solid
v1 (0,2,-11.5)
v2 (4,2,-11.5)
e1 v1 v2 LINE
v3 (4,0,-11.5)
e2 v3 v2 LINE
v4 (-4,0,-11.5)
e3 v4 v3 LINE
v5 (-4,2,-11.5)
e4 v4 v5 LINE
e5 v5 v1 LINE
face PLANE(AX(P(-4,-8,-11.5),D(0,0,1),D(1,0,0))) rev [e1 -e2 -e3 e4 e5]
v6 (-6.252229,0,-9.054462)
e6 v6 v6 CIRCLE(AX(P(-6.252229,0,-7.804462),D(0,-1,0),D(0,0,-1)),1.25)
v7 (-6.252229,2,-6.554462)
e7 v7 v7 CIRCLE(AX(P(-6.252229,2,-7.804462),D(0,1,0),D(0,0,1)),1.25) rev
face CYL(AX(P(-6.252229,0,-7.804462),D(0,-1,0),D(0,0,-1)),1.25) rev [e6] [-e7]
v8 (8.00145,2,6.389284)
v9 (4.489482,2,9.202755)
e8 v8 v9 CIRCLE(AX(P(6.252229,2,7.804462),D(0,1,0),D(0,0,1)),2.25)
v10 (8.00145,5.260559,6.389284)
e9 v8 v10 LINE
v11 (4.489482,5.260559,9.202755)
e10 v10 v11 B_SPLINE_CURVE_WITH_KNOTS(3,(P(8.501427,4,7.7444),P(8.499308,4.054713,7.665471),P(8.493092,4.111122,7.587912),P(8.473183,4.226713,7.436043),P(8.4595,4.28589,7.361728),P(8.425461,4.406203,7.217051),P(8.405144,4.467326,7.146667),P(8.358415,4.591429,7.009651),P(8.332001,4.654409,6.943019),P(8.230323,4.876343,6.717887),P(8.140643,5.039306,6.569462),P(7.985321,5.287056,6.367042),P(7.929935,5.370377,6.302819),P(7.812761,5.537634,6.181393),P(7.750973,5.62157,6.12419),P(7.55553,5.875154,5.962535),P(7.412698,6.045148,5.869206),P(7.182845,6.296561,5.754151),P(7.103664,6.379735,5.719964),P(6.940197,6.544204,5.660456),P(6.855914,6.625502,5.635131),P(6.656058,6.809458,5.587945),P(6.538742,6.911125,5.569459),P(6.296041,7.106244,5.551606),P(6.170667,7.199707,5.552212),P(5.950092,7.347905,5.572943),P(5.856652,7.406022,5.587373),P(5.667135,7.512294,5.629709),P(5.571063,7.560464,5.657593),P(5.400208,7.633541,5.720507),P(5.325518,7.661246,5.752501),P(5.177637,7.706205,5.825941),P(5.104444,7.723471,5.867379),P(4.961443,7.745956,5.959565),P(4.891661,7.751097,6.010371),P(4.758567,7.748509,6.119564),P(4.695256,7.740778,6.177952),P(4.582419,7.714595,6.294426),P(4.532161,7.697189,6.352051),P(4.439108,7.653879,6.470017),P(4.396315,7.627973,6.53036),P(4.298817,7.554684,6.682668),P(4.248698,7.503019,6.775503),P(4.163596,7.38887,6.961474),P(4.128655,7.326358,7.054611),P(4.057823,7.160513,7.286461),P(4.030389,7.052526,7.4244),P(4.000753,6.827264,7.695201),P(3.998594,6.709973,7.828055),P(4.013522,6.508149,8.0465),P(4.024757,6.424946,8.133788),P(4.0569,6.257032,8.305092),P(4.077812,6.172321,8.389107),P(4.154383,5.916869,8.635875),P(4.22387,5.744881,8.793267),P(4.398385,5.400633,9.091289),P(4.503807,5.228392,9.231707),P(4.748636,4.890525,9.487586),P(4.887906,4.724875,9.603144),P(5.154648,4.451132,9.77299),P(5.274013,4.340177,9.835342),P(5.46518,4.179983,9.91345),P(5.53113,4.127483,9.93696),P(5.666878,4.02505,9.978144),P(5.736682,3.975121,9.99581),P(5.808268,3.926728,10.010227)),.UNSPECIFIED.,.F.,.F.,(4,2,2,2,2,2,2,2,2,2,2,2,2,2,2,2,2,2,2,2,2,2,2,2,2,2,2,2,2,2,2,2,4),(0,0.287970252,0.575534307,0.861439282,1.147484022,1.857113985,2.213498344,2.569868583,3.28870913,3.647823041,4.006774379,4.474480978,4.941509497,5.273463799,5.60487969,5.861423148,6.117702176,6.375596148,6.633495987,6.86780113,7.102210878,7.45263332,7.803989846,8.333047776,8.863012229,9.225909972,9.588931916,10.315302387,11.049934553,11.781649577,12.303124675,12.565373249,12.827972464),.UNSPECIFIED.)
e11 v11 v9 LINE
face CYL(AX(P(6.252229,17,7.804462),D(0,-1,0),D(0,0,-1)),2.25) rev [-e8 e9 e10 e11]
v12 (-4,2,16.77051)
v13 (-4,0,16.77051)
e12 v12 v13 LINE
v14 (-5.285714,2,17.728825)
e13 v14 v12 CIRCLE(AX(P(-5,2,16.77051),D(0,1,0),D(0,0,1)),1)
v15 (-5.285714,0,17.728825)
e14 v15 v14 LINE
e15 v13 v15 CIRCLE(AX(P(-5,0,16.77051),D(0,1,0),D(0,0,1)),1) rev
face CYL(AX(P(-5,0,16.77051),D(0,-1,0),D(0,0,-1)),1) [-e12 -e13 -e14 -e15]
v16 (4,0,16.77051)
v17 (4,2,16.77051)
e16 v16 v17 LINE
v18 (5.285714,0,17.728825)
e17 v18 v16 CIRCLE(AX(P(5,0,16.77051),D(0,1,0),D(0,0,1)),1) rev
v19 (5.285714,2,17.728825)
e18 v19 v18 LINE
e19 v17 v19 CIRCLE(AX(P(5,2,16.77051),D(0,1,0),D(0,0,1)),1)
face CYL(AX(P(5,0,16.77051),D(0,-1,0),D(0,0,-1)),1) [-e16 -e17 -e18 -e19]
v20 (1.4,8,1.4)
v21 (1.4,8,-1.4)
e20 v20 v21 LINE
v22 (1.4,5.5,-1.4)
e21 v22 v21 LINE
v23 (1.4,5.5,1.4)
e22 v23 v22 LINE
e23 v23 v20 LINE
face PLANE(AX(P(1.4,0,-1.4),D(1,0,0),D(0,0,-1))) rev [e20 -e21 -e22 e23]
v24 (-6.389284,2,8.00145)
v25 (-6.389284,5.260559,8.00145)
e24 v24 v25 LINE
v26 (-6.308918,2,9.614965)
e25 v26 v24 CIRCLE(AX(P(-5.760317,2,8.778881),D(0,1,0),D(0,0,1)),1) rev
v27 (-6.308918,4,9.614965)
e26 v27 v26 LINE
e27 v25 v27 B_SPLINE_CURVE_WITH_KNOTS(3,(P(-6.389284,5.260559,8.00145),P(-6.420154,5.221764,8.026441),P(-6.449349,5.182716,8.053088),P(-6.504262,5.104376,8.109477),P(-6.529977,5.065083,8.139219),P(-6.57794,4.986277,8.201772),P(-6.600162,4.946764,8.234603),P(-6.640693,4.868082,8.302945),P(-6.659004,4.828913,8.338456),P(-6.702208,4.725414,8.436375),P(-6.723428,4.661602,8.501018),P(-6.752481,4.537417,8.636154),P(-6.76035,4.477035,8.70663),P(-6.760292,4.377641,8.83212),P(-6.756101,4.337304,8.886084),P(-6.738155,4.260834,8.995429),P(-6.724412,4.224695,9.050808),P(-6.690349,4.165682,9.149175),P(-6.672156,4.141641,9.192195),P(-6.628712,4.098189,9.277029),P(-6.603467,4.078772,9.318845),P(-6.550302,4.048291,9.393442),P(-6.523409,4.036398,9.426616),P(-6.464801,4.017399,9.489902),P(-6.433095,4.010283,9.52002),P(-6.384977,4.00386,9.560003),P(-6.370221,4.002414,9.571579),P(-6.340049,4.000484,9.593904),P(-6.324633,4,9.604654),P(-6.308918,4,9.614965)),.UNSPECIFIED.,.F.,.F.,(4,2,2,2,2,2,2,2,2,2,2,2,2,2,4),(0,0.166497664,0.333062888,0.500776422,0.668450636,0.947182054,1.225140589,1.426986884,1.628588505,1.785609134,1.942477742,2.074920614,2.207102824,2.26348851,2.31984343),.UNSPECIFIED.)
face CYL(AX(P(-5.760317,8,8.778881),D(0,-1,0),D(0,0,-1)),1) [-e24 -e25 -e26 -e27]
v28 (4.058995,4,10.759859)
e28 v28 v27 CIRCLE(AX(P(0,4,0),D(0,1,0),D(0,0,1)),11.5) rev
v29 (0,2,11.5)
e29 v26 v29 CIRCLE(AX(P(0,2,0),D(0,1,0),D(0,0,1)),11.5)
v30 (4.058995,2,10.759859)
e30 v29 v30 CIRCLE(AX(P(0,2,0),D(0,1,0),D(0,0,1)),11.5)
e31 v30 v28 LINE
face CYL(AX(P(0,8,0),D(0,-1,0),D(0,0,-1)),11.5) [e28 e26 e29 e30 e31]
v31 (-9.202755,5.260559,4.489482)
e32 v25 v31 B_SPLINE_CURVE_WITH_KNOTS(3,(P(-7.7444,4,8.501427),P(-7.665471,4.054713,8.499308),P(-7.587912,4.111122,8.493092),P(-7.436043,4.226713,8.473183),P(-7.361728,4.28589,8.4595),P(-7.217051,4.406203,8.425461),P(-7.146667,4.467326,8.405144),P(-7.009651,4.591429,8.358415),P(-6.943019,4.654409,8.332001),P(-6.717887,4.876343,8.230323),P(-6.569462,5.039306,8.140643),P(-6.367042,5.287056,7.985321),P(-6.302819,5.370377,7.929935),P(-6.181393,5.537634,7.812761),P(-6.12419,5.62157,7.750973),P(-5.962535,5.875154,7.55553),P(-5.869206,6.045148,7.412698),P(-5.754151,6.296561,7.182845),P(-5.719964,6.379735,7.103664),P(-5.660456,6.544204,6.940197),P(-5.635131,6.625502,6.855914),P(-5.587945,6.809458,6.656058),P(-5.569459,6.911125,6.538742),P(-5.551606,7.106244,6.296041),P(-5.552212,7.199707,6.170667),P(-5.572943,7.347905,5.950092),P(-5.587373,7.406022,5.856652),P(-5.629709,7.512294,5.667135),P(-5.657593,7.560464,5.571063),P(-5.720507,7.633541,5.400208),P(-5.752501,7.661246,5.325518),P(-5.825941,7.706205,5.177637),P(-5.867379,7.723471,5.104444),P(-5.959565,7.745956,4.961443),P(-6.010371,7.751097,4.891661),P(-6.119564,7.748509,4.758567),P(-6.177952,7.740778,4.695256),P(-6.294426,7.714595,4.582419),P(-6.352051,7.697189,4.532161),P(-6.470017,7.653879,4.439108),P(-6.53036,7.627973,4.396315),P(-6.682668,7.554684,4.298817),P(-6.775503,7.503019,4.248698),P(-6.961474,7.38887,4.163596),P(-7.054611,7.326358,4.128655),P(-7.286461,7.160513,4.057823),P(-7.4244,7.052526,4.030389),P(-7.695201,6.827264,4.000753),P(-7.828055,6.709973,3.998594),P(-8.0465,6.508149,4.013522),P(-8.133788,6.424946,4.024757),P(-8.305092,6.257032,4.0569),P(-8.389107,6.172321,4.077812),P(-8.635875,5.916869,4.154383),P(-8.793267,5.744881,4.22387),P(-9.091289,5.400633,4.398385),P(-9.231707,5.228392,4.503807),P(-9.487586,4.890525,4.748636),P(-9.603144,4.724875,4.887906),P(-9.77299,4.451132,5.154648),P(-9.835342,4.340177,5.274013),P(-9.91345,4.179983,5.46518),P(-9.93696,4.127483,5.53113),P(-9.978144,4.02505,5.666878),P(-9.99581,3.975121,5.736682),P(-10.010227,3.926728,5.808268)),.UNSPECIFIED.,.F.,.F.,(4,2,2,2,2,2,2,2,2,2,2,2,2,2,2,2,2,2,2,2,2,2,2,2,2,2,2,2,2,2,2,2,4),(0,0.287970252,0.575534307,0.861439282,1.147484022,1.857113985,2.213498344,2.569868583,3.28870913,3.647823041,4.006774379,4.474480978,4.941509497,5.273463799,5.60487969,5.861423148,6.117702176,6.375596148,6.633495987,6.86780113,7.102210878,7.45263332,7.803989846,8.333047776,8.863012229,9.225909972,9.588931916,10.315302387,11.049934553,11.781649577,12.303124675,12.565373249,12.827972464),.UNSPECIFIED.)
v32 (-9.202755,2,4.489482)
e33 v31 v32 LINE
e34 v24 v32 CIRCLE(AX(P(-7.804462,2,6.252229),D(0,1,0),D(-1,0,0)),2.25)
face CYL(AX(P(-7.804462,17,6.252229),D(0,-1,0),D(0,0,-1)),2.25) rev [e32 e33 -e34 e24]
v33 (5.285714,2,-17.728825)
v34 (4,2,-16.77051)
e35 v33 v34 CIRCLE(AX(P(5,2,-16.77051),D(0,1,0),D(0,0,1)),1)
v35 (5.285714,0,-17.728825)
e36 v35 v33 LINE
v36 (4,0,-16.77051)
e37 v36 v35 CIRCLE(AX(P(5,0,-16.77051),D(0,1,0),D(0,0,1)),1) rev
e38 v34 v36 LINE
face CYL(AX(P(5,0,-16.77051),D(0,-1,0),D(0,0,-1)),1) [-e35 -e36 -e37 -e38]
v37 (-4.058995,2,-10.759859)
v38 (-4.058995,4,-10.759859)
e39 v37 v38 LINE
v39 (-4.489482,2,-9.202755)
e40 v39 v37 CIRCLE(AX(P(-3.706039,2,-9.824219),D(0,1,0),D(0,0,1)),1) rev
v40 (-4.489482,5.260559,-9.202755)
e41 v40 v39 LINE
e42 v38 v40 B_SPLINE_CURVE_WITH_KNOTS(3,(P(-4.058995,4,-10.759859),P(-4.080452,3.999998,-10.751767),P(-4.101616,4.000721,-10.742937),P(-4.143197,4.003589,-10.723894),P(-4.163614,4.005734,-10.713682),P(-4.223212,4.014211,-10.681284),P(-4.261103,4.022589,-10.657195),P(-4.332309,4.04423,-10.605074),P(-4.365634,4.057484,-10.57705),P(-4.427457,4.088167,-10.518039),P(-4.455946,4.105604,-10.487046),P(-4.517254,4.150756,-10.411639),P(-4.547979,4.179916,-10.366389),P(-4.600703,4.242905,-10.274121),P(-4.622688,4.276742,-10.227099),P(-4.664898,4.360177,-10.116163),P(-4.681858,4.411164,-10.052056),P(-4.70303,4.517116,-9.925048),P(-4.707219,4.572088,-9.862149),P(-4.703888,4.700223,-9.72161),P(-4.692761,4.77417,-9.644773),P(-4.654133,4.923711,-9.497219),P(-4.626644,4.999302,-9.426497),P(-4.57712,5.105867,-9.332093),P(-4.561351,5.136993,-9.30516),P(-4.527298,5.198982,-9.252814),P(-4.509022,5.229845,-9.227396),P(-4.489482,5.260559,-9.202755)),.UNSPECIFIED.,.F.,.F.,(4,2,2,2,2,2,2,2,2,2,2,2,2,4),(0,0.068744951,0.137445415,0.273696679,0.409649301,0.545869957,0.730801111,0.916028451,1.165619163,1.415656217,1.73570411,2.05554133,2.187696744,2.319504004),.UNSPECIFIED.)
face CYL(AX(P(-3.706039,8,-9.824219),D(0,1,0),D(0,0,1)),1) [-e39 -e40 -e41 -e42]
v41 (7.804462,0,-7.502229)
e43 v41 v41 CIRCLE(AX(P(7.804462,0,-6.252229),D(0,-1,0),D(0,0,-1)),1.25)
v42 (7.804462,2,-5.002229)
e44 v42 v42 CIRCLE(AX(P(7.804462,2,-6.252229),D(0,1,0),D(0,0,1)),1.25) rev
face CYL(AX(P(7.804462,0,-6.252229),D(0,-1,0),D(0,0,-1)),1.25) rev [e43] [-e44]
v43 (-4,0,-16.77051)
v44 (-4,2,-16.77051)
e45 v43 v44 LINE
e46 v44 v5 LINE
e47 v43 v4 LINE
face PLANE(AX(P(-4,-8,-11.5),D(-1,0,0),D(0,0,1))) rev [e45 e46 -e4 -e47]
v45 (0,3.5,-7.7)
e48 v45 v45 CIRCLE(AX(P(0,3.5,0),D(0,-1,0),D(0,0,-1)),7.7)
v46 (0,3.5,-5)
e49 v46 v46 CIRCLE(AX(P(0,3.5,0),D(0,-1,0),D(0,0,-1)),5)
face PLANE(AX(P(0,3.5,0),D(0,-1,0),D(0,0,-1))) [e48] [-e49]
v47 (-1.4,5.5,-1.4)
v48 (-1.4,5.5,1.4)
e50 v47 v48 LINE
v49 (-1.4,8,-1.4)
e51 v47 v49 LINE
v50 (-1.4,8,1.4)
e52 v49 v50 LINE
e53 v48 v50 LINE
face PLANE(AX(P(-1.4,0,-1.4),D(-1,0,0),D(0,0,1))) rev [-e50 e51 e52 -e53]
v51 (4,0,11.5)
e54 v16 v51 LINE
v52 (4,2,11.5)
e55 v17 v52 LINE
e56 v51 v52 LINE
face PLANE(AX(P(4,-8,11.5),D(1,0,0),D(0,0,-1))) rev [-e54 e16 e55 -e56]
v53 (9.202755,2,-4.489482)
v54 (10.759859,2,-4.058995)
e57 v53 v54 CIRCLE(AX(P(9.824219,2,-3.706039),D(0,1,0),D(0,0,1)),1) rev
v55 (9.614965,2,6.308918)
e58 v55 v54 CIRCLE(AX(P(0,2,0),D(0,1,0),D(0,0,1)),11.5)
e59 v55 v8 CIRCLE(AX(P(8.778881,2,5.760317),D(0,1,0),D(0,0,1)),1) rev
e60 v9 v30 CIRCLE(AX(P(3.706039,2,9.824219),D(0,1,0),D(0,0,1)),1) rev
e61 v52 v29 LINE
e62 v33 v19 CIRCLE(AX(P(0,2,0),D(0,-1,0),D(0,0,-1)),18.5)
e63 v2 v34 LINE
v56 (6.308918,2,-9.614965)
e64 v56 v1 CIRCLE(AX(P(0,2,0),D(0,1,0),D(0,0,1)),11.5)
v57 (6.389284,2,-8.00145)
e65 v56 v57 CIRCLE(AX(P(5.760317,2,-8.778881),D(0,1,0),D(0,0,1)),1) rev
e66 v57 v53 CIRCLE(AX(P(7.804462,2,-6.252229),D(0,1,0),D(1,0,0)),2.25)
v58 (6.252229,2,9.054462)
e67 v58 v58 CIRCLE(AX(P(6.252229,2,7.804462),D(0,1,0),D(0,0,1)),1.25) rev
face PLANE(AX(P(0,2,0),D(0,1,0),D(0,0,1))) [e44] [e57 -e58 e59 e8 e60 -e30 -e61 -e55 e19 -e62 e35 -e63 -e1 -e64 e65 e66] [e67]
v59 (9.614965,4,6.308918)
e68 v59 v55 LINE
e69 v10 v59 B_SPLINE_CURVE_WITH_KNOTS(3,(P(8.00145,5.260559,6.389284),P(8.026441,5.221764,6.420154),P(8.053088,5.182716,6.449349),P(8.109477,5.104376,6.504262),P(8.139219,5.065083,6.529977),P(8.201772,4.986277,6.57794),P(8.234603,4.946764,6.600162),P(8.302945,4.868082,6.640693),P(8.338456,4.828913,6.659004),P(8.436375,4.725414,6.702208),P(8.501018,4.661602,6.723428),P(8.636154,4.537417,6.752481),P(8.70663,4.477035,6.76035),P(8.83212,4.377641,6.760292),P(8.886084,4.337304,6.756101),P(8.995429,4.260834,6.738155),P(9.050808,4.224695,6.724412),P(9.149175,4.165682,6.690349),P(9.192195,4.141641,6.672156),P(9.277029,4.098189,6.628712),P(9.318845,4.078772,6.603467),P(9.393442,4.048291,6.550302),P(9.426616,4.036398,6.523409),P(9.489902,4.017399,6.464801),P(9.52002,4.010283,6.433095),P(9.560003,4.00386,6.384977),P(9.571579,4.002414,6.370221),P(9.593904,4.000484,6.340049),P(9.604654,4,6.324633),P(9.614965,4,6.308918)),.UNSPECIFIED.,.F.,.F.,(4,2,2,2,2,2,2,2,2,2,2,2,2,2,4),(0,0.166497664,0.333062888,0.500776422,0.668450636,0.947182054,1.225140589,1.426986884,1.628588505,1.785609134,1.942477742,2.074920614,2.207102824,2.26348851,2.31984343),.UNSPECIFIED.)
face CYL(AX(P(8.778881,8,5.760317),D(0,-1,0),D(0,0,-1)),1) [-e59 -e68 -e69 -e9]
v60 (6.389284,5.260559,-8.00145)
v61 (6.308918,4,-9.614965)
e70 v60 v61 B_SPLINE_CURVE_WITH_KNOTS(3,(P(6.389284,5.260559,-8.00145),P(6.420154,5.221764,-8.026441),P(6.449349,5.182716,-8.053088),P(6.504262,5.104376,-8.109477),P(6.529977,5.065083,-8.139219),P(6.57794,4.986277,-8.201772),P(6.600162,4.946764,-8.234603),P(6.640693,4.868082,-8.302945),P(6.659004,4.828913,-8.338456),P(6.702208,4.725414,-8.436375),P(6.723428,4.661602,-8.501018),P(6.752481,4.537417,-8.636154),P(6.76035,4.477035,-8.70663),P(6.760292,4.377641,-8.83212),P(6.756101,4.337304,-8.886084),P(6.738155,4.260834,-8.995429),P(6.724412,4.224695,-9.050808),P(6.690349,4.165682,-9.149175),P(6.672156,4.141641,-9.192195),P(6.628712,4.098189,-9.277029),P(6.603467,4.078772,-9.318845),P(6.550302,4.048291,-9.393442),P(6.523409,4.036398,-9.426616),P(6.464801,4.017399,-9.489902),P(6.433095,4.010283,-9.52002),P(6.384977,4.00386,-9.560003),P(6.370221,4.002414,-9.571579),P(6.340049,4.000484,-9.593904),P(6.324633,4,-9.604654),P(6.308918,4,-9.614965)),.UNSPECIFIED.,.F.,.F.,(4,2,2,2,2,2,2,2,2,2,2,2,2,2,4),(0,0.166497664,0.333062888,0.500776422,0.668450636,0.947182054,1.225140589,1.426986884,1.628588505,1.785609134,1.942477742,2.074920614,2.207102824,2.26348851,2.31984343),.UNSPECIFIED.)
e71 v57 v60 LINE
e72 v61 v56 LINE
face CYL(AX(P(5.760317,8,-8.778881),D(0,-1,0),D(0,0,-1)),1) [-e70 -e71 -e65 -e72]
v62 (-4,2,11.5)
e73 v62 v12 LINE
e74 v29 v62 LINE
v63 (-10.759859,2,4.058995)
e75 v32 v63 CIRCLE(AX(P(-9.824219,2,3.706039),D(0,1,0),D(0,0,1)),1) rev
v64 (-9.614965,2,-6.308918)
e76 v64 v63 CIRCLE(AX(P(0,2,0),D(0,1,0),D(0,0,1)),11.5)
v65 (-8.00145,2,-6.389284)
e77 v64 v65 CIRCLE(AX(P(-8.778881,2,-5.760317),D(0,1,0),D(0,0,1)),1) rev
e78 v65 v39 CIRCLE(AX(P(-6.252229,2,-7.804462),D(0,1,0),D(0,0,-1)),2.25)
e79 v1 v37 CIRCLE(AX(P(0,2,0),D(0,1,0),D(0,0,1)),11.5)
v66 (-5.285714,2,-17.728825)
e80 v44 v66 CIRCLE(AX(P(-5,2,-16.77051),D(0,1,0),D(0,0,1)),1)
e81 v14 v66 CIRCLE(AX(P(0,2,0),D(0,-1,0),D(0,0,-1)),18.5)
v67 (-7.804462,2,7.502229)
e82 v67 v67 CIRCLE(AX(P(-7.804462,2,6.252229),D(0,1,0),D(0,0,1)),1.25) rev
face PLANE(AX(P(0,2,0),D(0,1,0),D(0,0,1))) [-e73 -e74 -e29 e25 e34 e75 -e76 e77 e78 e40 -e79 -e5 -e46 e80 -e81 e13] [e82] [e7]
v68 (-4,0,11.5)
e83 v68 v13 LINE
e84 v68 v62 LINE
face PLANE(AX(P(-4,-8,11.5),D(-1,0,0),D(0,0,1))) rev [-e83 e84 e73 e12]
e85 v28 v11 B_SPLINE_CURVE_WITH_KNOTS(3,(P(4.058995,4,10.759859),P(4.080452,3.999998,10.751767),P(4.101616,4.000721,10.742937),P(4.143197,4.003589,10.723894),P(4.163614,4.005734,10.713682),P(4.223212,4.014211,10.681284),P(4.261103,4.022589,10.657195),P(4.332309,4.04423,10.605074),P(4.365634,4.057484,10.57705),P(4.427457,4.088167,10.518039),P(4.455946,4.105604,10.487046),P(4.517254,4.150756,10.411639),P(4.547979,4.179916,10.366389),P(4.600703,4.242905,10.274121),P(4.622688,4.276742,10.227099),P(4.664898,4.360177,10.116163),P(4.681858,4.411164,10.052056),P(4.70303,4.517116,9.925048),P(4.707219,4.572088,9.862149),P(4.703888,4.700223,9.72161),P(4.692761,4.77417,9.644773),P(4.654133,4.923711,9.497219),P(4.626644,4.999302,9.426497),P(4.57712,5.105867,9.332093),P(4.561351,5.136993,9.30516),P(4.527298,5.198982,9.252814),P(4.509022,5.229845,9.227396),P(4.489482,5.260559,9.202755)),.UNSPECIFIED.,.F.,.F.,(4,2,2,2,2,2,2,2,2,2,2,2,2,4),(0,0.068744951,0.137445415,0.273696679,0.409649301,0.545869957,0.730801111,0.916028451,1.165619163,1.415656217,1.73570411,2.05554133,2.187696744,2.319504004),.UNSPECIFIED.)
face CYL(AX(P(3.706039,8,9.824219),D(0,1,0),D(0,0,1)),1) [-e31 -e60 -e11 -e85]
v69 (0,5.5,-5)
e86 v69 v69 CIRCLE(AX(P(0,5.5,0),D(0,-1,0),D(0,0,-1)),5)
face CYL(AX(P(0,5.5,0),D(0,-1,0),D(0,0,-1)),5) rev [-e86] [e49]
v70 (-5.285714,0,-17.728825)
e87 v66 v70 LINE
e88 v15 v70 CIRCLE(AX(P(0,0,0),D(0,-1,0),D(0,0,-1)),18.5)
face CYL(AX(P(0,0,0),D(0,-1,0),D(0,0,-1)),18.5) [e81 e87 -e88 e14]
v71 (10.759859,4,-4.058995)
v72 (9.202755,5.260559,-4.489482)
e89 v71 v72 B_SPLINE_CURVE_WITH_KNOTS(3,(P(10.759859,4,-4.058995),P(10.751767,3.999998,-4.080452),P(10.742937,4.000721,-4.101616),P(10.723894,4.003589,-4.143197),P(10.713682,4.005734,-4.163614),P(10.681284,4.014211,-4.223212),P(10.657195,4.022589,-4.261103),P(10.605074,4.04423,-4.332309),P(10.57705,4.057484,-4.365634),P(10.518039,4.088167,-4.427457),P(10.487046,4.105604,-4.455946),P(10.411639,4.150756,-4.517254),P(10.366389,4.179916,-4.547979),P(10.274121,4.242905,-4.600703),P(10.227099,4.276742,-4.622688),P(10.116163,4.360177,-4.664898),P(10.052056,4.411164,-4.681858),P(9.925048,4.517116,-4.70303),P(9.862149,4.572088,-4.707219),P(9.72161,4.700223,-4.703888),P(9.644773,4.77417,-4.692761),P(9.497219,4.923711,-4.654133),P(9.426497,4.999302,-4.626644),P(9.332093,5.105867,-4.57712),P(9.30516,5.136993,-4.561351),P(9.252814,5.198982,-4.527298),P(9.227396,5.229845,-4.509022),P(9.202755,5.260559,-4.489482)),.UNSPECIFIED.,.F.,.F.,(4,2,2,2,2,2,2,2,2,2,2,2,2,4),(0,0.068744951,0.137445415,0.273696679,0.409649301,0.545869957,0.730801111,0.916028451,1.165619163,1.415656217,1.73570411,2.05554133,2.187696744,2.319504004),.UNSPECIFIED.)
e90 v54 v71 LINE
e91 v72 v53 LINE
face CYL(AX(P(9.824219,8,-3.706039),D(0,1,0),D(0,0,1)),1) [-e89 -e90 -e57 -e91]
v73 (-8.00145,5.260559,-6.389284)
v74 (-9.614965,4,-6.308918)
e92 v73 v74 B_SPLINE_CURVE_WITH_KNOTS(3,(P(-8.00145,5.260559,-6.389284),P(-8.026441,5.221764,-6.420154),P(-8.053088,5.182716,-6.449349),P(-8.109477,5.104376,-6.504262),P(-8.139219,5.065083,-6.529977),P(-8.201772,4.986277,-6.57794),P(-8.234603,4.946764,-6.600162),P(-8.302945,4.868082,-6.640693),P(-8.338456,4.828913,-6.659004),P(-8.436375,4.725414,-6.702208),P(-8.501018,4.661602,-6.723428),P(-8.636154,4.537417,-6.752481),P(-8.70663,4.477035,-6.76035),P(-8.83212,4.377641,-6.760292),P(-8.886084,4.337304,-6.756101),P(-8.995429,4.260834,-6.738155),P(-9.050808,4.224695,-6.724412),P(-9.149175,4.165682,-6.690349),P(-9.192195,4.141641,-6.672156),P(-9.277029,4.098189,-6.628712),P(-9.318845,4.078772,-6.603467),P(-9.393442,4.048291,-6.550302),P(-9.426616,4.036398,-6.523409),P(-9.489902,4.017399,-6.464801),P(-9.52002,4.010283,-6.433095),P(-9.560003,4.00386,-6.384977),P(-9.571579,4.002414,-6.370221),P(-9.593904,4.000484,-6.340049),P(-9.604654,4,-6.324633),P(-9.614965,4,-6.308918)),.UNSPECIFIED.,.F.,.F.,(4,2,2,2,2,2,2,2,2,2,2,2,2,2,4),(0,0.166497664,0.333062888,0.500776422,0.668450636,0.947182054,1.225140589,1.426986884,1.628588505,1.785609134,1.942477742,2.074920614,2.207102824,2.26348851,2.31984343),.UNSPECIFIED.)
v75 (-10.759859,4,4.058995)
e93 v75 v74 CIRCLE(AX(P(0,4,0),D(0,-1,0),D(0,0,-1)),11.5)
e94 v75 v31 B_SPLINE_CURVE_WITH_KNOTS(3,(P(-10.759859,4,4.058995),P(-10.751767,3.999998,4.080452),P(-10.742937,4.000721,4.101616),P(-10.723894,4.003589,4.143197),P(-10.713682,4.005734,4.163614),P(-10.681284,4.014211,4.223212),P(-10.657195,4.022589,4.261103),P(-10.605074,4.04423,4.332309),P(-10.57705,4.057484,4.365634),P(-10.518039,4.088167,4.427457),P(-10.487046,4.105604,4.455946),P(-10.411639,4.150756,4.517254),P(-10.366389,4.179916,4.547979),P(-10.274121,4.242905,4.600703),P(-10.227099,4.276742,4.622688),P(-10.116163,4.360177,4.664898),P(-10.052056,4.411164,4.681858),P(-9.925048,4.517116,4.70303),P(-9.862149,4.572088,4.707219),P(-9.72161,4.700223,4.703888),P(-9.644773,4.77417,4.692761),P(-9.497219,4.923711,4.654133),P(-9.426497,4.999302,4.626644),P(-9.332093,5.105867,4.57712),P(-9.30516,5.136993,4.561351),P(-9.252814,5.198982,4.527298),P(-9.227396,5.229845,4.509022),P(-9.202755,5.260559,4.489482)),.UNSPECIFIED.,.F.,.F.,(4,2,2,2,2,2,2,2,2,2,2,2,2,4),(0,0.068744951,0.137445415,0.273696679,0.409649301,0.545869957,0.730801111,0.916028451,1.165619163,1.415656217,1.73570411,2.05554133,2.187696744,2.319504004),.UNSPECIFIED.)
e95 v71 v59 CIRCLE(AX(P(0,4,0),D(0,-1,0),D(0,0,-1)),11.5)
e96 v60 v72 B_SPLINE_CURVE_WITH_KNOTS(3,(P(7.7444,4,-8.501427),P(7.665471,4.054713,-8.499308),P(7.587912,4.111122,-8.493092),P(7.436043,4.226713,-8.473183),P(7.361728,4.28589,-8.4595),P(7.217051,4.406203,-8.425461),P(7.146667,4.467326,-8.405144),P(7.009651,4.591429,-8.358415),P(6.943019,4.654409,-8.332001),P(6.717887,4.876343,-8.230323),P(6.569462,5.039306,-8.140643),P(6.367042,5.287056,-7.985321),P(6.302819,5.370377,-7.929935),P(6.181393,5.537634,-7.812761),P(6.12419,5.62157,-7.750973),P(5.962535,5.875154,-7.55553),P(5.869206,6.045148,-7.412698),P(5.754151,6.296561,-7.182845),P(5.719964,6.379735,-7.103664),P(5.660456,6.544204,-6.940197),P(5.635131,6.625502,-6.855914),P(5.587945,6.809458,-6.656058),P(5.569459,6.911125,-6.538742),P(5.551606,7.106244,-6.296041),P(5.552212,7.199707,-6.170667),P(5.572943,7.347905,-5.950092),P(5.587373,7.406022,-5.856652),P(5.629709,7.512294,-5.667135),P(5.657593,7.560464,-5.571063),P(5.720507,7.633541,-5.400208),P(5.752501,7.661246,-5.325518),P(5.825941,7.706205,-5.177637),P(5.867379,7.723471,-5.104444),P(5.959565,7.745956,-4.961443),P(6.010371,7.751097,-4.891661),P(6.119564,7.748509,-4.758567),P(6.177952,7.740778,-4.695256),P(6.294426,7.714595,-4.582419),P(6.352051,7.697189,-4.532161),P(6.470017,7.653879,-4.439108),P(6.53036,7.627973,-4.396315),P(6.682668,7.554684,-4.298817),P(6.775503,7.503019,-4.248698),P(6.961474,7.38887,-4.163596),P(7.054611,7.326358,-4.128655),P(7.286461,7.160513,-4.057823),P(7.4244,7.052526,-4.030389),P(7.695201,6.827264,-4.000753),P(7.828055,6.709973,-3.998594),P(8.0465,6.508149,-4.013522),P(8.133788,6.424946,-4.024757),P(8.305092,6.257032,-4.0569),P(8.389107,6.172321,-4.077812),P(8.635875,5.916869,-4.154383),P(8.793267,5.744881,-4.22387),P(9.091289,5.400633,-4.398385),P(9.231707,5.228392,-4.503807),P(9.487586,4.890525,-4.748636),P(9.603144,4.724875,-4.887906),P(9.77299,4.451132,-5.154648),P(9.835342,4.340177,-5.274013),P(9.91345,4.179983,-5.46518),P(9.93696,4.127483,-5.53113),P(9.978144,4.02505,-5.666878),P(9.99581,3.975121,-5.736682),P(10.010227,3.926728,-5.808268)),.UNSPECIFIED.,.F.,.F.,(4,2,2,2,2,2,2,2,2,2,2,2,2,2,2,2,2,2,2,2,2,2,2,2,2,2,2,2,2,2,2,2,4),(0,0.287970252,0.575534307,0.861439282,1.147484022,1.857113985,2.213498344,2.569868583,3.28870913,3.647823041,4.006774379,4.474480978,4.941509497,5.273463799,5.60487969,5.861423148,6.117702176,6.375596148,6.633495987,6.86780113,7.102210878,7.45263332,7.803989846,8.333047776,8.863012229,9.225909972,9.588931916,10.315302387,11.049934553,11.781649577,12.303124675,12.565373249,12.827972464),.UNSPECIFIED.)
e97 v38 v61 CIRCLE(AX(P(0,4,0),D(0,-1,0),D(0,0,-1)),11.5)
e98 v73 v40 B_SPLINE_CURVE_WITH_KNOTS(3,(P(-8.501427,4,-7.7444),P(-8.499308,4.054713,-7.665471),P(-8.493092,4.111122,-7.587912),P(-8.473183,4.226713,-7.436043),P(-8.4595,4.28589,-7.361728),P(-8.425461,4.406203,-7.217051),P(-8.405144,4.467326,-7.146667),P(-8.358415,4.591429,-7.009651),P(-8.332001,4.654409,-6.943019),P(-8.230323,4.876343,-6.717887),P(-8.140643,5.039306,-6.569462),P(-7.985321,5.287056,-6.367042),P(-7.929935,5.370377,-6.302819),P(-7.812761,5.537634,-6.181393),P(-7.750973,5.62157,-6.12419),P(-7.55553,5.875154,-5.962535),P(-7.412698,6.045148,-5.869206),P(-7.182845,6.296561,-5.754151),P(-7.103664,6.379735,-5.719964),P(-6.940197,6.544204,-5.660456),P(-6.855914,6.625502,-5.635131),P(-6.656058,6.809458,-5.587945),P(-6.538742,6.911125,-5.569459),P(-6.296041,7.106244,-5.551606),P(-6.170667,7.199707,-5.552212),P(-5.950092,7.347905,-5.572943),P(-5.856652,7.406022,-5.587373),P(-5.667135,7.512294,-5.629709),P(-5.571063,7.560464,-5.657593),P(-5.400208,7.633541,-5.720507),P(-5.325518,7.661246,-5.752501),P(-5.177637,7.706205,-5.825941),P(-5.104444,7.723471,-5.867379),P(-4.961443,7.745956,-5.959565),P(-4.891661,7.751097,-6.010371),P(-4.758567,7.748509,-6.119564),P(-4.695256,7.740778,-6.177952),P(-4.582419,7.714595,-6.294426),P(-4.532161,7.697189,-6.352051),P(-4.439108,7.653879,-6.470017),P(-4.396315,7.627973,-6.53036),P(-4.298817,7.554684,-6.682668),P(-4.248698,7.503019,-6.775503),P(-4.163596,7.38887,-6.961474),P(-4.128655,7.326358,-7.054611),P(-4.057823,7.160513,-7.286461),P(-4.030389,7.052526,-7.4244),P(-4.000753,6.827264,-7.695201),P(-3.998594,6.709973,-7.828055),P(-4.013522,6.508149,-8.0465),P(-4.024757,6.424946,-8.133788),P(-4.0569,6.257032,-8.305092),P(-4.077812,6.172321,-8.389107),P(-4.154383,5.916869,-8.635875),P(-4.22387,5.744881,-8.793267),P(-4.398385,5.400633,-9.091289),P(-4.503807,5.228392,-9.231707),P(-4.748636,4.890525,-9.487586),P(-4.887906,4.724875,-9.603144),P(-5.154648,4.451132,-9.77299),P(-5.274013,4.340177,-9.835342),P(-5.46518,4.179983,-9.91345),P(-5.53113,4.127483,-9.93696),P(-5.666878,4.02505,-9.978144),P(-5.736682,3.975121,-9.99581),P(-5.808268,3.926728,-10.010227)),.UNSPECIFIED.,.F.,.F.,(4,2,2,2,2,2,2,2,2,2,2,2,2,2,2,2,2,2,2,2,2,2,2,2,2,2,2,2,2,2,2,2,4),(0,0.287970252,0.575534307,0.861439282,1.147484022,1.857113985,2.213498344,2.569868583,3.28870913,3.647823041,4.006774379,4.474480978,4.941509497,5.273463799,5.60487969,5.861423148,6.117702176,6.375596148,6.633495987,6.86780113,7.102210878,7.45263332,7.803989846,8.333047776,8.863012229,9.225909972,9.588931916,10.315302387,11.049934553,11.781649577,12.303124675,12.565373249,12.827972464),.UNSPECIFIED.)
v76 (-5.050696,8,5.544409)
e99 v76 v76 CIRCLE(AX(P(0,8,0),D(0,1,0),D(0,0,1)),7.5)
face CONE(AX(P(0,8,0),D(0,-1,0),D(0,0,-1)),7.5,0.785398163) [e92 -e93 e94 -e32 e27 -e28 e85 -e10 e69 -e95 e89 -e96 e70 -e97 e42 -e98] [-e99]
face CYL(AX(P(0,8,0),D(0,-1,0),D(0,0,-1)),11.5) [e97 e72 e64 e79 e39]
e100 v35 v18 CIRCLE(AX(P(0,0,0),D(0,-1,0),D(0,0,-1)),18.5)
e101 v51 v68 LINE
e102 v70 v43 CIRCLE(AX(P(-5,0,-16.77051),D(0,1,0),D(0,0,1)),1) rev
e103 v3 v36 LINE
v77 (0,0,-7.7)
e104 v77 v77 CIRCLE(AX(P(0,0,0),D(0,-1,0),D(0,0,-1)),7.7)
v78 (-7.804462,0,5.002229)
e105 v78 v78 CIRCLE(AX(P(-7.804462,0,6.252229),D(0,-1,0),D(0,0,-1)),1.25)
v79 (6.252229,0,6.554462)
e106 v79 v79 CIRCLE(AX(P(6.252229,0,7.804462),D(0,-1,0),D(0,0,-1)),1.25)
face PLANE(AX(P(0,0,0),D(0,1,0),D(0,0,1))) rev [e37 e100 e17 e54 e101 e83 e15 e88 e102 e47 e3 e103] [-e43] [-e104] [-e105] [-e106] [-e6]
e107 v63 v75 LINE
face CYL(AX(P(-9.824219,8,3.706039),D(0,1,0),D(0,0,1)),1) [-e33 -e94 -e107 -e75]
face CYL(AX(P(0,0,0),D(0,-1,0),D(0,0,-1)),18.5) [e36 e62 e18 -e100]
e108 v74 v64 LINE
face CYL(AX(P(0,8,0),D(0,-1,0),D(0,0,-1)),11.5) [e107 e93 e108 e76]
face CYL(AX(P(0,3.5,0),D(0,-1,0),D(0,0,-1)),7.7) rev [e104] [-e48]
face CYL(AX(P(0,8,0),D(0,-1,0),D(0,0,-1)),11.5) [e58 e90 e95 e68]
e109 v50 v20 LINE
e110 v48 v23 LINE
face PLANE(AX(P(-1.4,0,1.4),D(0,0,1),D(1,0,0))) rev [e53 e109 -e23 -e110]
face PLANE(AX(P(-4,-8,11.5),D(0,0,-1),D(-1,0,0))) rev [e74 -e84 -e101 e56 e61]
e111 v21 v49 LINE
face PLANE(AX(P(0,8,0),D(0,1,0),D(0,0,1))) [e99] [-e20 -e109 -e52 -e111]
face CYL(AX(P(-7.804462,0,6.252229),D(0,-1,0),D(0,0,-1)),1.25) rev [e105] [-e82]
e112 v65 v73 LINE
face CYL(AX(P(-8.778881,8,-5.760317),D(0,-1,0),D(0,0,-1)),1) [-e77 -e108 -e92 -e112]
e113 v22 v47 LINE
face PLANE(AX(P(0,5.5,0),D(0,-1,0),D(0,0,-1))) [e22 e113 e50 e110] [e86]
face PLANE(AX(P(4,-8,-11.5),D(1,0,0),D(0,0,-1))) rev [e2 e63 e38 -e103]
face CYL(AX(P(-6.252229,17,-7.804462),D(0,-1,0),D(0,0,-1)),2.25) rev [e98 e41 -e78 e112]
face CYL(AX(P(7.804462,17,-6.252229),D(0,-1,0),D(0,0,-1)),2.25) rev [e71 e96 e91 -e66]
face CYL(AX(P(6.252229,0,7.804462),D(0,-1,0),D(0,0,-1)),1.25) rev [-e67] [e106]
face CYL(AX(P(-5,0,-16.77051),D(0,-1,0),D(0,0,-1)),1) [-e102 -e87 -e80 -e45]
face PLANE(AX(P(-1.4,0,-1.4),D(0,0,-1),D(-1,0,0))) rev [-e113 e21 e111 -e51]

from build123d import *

# Parameters (mm, degrees)
SKETCH1_R             = 12.5
BOSS_EXTRUDE1_DEPTH   = 2
SKETCH2_R             = 11.5
BOSS_EXTRUDE2_DEPTH   = 6
F_2_5MM_DOWEL_HOLE1_D = 2.5
SKETCH7_R             = 2.25
CUT_EXTRUDE1_DEPTH    = 15
CIRPATTERN1_COUNT     = 4
SKETCH8_R             = 7.7
CUT_EXTRUDE2_DEPTH    = 3.5
CHAMFER4_SIZE         = 4
SKETCH3_W             = 2.8
SKETCH3_H             = 2.8
CUT_EXTRUDE3_DEPTH    = 20.403607912
SKETCH9_R             = 5
CUT_EXTRUDE4_DEPTH    = 2
FILLET1_R             = 1
SKETCH11_W            = 6
SKETCH11_H            = 2
SKETCH13_W            = 8
SKETCH13_H            = 10.327587527
CUT_EXTRUDE5_DEPTH    = 10
FILLET2_R             = 1


with BuildPart() as part:
    # Sketch1 → Boss-Extrude1 (new body)
    with BuildSketch(Plane(origin=(0, 0, 0), x_dir=(1, 0, 0), z_dir=(0, 1, 0))):
        with Locations(Location((0, 0, 0), (0, 0, 270))):
            Circle(SKETCH1_R)
    extrude(amount=BOSS_EXTRUDE1_DEPTH)

    # Sketch2 → Boss-Extrude2 (add)
    with BuildSketch(Plane(origin=(0, 2, 0), x_dir=(1, 0, 0), z_dir=(0, 1, 0))):
        with Locations(Location((0, 0, 0), (0, 0, 270))):
            Circle(SKETCH2_R)
    extrude(amount=BOSS_EXTRUDE2_DEPTH)

    # Ø2.5mm Dowel Hole1 (through all)
    with Locations(Plane(origin=(0, 0, 0), x_dir=(-1, 0, 0), z_dir=(0, -1, 0))):
        with Locations((-6.252229289, -7.804462116)):
            f_2_5mm_dowel_hole1 = Hole(F_2_5MM_DOWEL_HOLE1_D / 2)

    # Sketch7 → Cut-Extrude1 (cut)
    with BuildSketch(Plane(origin=(0, 2, 0), x_dir=(1, 0, 0), z_dir=(0, 1, 0))):
        with Locations((6.252229289, -7.804462116)):
            Circle(SKETCH7_R)
    cut_extrude1 = extrude(amount=CUT_EXTRUDE1_DEPTH, mode=Mode.SUBTRACT)

    # CirPattern1: Ø2.5mm Dowel Hole1, Cut-Extrude1 ×4 about axis
    cirpattern1_axis = Axis((0, 0, 0), (0, 1, 0))
    add([f_2_5mm_dowel_hole1.rotate(cirpattern1_axis, i * 360 / CIRPATTERN1_COUNT) for i in range(1, CIRPATTERN1_COUNT)], mode=Mode.SUBTRACT)
    add([cut_extrude1.rotate(cirpattern1_axis, i * 360 / CIRPATTERN1_COUNT) for i in range(1, CIRPATTERN1_COUNT)], mode=Mode.SUBTRACT)

    # Sketch8 → Cut-Extrude2 (cut)
    with BuildSketch(Plane.XZ):
        with Locations(Location((0, 0, 0), (0, 0, 270))):
            Circle(SKETCH8_R)
    extrude(amount=-CUT_EXTRUDE2_DEPTH, mode=Mode.SUBTRACT)

    # Chamfer4
    # the kernel refuses this chamfer: 4 mm, written as the material it takes off along each edge
    with BuildSketch(Plane(origin=(0, 8, 0), x_dir=(-0.15654942512802536, 0, 0.9876701258477371), z_dir=(0.9876701258477371, 0, 0.15654942512802536))) as chamfer4_piece_1:
        Polygon((11.5, CHAMFER4_SIZE), (11.5 - CHAMFER4_SIZE, 0), (11.5, 0), align=None)
    revolve(axis=Axis((0, 8, 0), (0, -1, 0)), revolution_arc=174.589558781, mode=Mode.SUBTRACT)
    with BuildSketch(Plane(origin=(0, 8, 0), x_dir=(0.9876701258477374, 0, 0.15654942512802353), z_dir=(0.15654942512802353, 0, -0.9876701258477374))) as chamfer4_piece_2:
        Polygon((11.5, CHAMFER4_SIZE), (11.5 - CHAMFER4_SIZE, 0), (11.5, 0), align=None)
    revolve(axis=Axis((0, 8, 0), (0, -1, 0)), revolution_arc=174.589558781, mode=Mode.SUBTRACT)
    with BuildSketch(Plane(origin=(0, 8, 0), x_dir=(-0.9876701258477374, 0, -0.15654942512802342), z_dir=(-0.15654942512802342, 0, 0.9876701258477374))) as chamfer4_piece_3:
        Polygon((11.5, CHAMFER4_SIZE), (11.5 - CHAMFER4_SIZE, 0), (11.5, 0), align=None)
    revolve(axis=Axis((0, 8, 0), (0, -1, 0)), revolution_arc=174.589558781, mode=Mode.SUBTRACT)
    with BuildSketch(Plane(origin=(0, 8, 0), x_dir=(0.15654942512802555, 0, -0.987670125847737), z_dir=(-0.987670125847737, 0, -0.15654942512802555))) as chamfer4_piece_4:
        Polygon((11.5, CHAMFER4_SIZE), (11.5 - CHAMFER4_SIZE, 0), (11.5, 0), align=None)
    revolve(axis=Axis((0, 8, 0), (0, -1, 0)), revolution_arc=174.589558781, mode=Mode.SUBTRACT)

    # Sketch3 → Cut-Extrude3 (cut, through all)
    with BuildSketch(Plane(origin=(0, 8, 0), x_dir=(1, 0, 0), z_dir=(0, 1, 0))):
        Rectangle(SKETCH3_W, SKETCH3_H)
    extrude(amount=-CUT_EXTRUDE3_DEPTH, mode=Mode.SUBTRACT)

    # Sketch9 → Cut-Extrude4 (cut)
    with BuildSketch(Plane.XZ.offset(-3.5)):
        with Locations(Location((0, 0, 0), (0, 0, 270))):
            Circle(SKETCH9_R)
    extrude(amount=-CUT_EXTRUDE4_DEPTH, mode=Mode.SUBTRACT)

    # Fillet1
    # the kernel refuses this fillet: 1 mm, written as the material it takes off along each edge
    with BuildSketch(Plane(origin=(-7.744399955, 8.541870217, 8.501427488), x_dir=(0.7901380360957252, 0, 0.6129289387154032), z_dir=(0, -1, 0)), Plane(origin=(-8.501427488, 8.541870217, -7.744399955), x_dir=(-0.6129289387154034, 0, 0.790138036095725), z_dir=(0, -1, 0)), Plane(origin=(8.501427488, 8.541870217, 7.744399955), x_dir=(0.6129289387154006, 0, -0.7901380360957272), z_dir=(0, -1, 0))) as fillet1_piece_1:
        with BuildLine():
            CenterArc((1.73775904, -0.996875484), FILLET1_R, 85.469541484, 107.754858312)
            ThreePointArc((0.76427747, -1.225640938), (0.48316298, -0.549824406), (0, 0))
            ThreePointArc((0, 0), (0.908374043, 0.035931935), (1.816748087, 0))
        make_face()
    extrude(amount=6.541870217, mode=Mode.SUBTRACT)
    with BuildSketch(Plane(origin=(-9.986362414, 8.541870217, 5.702855929), x_dir=(0.5425108766100752, 0, -0.840048777607448), z_dir=(0, -1, 0)), Plane(origin=(-5.702855929, 8.541870217, -9.986362414), x_dir=(0.8400487776074425, 0, 0.5425108766100841), z_dir=(0, -1, 0)), Plane(origin=(9.986362414, 8.541870217, -5.702855929), x_dir=(-0.5425108766100888, 0, 0.8400487776074392), z_dir=(0, -1, 0)), Plane(origin=(5.702855929, 8.541870217, 9.986362414), x_dir=(-0.8400487776074446, 0, -0.5425108766100806), z_dir=(0, -1, 0))) as fillet1_piece_2:
        with BuildLine():
            CenterArc((1.765388102, -0.94708609), FILLET1_R, 108.722180598, 107.754858312)
            ThreePointArc((0.961292932, -1.541586686), (0.450156717, -0.789805949), (0, 0))
            ThreePointArc((0, 0), (0.722204223, -0.119056298), (1.444408447, 0))
        make_face()
    extrude(amount=6.541870217, mode=Mode.SUBTRACT)
    with BuildSketch(Plane(origin=(7.744399955, 8.541870217, -8.501427488), x_dir=(-0.9381802645731545, 0, 0.34614706580505045), z_dir=(0, -1, 0))) as fillet1_piece_3:
        with BuildLine():
            CenterArc((1.765388102, 0.94708609), FILLET1_R, 143.52296109, 107.754858312)
            ThreePointArc((0.961292932, 1.541586686), (0.450156717, 0.789805949), (0, 0))
            ThreePointArc((0, 0), (0.722204223, 0.119056298), (1.444408447, 0))
        make_face()
    extrude(amount=6.541870217, mode=Mode.SUBTRACT)

    # Sketch11 → Revolve1 (revolve)
    with BuildSketch(Plane(origin=(0, 0, 0), x_dir=(0, 0, -1), z_dir=(1, 0, 0)), mode=Mode.PRIVATE) as revolve1_sk:
        with Locations((15.5, 1)):
            Rectangle(SKETCH11_W, SKETCH11_H)
    revolve(revolve1_sk.sketch.rotate(Axis((0, 0, 0), (0, 1, 0)), 20.668231864), axis=Axis((0, 0, 0), (0, 1, 0)))

    # Sketch13 → Cut-Extrude5 (cut)
    with BuildSketch(Plane(origin=(0, 2, 0), x_dir=(1, 0, 0), z_dir=(0, 1, 0))):
        with Locations((0, 16.663793764)):
            Rectangle(SKETCH13_W, SKETCH13_H)
        with Locations((0, -16.663793764)):
            Rectangle(SKETCH13_W, SKETCH13_H)
    extrude(amount=-CUT_EXTRUDE5_DEPTH, mode=Mode.SUBTRACT)

    # Fillet2
    fillet2_edges = [part.edges().sort_by_distance(p)[0] for p in [
        (-4, 1, -18.062391868),
        (4, 1, -18.062391868),
        (4, 1, 18.062391868),
        (-4, 1, 18.062391868),
    ]]
    fillet(fillet2_edges, radius=FILLET2_R)


solid = part.part
